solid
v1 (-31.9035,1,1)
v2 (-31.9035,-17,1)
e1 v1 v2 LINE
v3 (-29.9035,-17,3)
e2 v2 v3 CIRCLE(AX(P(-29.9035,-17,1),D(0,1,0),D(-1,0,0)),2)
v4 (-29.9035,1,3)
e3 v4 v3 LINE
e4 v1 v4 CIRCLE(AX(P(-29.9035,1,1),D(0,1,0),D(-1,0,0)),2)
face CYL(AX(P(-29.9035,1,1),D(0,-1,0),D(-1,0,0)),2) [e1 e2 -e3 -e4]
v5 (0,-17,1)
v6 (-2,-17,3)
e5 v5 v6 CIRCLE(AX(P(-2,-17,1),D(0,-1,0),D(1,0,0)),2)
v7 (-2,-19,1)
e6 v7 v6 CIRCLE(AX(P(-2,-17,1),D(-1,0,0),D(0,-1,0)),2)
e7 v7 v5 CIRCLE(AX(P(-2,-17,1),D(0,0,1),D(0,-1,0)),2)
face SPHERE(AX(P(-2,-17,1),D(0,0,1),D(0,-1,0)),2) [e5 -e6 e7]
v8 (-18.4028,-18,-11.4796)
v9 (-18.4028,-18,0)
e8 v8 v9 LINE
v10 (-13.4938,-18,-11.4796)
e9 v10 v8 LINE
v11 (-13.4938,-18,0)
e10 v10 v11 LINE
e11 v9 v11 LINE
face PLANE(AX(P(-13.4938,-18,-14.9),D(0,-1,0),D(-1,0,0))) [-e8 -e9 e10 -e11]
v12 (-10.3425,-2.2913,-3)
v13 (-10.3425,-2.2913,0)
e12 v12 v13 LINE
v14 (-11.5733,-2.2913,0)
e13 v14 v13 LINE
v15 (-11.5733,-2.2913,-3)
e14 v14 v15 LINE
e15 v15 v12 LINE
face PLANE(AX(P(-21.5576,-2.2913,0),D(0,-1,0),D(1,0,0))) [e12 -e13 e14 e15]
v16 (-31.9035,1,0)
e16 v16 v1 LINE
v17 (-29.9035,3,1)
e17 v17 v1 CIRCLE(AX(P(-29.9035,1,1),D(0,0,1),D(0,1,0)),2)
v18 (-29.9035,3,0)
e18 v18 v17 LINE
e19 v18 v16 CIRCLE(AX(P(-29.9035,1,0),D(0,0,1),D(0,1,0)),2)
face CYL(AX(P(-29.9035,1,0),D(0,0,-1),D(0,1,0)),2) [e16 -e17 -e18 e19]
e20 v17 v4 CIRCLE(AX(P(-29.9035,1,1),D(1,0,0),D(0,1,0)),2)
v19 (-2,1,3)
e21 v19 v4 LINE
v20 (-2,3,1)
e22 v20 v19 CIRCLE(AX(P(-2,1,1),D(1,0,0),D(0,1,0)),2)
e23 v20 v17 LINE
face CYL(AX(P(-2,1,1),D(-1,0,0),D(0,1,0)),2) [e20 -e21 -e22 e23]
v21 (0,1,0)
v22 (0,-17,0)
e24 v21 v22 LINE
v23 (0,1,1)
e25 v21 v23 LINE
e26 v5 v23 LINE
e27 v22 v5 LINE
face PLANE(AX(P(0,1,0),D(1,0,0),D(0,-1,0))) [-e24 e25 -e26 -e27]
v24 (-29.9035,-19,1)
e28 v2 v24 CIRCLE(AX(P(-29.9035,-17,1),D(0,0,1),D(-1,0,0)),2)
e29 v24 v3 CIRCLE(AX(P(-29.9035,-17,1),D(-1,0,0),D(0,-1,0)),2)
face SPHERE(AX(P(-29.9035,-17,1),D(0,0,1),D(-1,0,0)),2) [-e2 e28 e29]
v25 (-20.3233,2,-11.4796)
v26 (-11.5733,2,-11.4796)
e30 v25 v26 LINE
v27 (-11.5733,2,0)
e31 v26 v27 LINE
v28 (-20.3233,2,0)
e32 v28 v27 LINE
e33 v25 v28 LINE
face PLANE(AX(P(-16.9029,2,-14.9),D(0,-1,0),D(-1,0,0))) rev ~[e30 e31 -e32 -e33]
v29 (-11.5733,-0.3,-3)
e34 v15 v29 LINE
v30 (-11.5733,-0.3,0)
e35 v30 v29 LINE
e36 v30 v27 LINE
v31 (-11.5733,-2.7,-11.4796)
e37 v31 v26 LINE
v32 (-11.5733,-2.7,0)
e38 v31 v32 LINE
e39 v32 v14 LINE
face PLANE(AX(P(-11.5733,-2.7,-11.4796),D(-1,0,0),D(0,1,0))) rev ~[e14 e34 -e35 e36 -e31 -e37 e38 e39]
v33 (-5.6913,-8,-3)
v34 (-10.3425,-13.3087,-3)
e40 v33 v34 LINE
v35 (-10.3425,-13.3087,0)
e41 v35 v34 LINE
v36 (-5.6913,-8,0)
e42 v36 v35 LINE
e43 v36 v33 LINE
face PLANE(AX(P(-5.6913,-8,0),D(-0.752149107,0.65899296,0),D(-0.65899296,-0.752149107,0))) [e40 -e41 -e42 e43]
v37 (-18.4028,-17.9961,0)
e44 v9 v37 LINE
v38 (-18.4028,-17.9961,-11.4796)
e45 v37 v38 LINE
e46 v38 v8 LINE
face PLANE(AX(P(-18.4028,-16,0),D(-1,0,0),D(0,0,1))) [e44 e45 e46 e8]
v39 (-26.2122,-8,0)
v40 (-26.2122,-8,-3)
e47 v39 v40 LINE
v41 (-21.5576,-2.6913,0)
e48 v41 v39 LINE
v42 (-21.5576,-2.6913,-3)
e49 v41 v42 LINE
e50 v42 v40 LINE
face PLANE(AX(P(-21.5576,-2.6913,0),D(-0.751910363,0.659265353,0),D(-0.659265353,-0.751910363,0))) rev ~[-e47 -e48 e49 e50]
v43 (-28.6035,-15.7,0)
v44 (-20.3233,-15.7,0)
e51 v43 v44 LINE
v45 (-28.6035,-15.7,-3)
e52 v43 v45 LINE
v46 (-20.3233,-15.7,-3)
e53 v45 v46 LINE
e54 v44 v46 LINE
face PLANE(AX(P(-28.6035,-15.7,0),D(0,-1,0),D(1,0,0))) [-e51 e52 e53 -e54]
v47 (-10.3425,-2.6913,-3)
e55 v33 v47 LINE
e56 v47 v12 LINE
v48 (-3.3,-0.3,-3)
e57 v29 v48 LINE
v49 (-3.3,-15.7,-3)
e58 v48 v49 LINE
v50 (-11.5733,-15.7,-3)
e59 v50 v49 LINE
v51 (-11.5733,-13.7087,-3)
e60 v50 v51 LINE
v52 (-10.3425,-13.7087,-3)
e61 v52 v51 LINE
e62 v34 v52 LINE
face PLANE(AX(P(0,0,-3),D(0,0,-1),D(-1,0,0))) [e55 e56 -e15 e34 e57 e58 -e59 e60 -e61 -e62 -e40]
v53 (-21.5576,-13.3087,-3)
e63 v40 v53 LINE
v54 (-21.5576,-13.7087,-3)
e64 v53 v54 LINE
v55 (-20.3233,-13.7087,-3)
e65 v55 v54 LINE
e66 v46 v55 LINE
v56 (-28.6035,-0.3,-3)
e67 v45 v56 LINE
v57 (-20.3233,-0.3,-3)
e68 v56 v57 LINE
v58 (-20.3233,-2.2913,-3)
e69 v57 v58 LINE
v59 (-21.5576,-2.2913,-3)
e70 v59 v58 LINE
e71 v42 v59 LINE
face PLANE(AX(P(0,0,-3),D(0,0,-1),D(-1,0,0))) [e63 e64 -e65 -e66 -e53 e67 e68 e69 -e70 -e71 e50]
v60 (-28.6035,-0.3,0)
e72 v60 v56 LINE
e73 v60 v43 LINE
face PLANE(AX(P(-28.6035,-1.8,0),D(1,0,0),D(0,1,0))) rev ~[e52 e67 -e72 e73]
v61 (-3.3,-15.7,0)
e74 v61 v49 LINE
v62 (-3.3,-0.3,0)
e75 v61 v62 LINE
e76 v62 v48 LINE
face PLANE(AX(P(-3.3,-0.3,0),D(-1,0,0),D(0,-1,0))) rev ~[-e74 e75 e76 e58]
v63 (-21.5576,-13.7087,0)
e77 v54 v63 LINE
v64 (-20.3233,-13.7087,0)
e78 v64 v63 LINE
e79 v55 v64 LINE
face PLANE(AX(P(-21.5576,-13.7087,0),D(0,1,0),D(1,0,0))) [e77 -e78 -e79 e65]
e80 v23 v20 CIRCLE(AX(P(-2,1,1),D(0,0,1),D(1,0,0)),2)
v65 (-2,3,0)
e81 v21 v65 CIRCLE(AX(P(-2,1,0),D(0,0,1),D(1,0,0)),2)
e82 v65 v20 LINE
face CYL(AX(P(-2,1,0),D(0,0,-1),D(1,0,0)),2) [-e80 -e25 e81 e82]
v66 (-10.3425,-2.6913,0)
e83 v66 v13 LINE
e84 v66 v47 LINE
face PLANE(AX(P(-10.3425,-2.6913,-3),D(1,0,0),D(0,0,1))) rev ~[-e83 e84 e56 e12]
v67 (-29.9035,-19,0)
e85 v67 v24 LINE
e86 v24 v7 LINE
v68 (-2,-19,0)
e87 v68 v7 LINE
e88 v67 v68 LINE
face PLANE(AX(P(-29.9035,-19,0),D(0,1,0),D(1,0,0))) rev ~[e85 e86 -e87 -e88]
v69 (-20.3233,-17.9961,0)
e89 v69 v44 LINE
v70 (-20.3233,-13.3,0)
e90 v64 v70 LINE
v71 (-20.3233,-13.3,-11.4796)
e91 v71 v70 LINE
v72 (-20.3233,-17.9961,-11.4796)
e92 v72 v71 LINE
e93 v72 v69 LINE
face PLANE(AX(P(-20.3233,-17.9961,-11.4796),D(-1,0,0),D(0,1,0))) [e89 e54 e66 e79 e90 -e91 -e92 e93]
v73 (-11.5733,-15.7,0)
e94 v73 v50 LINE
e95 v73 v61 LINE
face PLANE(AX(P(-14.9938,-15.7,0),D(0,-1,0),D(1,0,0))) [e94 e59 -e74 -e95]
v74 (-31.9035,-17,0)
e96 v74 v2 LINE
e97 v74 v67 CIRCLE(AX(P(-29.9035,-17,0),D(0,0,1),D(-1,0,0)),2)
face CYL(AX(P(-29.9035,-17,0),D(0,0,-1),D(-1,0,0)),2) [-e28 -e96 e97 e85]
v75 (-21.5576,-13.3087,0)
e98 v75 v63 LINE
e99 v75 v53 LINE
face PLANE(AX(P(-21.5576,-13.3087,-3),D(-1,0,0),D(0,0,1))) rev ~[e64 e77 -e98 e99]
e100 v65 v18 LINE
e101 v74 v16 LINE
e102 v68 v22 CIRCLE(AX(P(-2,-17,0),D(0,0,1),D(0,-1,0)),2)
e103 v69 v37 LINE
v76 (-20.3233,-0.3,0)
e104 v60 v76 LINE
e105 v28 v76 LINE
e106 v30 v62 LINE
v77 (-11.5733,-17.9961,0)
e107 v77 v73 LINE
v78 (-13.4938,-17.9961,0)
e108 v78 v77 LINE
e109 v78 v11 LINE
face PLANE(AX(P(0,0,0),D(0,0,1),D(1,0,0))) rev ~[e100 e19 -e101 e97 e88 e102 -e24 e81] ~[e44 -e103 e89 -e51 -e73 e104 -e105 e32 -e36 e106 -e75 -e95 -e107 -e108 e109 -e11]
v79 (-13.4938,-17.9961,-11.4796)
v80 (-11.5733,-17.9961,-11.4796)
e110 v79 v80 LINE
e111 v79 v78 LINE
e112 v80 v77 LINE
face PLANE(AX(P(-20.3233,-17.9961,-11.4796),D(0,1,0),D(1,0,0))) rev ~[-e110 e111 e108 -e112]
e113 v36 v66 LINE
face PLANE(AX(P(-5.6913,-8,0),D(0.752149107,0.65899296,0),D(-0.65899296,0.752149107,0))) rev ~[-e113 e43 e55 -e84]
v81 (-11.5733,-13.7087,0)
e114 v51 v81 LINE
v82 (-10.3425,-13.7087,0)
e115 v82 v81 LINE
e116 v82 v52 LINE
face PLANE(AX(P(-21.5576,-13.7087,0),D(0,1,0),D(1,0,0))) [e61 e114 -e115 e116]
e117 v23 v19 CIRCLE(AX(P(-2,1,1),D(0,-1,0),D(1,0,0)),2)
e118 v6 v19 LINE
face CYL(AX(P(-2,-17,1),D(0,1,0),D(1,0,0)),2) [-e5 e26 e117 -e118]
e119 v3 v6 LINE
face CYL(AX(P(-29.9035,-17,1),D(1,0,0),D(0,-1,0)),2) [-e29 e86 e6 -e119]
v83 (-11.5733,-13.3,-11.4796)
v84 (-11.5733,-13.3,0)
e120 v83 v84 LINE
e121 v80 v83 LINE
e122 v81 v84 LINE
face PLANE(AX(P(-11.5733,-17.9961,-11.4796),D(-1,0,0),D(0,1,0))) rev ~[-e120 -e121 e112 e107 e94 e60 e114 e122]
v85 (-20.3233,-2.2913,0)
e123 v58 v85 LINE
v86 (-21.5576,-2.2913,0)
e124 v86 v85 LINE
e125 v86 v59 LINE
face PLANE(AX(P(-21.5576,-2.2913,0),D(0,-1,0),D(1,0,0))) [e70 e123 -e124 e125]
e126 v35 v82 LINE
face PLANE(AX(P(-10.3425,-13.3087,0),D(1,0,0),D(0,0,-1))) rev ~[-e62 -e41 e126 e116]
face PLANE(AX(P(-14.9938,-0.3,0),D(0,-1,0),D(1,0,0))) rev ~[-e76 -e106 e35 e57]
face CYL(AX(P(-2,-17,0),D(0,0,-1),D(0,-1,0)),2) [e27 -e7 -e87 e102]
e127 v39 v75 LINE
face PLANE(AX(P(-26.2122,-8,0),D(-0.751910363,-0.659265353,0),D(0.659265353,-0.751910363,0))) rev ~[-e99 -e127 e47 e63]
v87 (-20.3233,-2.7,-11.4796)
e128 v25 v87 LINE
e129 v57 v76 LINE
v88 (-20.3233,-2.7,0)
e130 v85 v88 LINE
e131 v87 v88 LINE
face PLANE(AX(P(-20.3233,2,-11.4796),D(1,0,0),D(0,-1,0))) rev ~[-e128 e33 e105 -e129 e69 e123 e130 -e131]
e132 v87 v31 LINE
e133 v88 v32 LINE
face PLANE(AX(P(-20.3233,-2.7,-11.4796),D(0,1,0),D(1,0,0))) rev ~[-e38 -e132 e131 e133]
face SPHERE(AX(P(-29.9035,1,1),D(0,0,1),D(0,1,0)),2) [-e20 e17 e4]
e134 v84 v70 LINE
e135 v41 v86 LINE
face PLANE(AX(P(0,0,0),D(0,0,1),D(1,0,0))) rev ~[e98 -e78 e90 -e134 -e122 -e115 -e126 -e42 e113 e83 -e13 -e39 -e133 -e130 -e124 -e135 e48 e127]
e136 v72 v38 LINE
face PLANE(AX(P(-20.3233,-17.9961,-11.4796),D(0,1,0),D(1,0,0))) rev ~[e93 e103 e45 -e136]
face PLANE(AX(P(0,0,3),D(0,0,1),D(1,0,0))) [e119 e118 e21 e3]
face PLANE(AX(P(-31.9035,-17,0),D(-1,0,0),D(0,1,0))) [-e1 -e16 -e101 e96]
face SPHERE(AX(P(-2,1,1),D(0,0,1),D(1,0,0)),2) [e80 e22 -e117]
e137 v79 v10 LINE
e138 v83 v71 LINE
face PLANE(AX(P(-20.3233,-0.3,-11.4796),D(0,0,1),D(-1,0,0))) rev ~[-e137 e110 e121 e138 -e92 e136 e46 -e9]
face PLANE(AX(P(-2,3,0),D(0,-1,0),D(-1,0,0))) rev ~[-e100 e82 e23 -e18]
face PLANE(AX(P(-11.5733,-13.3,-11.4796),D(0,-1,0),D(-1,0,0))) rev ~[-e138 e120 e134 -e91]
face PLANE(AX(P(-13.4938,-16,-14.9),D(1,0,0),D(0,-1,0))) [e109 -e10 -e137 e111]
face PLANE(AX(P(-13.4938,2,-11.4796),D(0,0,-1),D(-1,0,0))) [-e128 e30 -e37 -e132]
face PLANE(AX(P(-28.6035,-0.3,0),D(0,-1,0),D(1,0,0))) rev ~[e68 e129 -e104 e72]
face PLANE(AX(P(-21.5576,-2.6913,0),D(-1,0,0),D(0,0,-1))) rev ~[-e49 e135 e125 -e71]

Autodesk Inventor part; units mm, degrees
ref_plane "YZ Plane" through (0, 0, 0) normal (1, 0, 0) x (0, 1, 0)
ref_plane "XZ Plane" through (0, 0, 0) normal (0, 1, 0) x (-1, 0, 0)
sketch "Sketch1" plane through (0, 0, 0) normal (0, 0, 1) x (1, 0, 0)
  arc A0 (-31.9035, -17) -> (-29.9035, -19) centre (-29.9035, -17) ccw projected
  line L0 (-29.9035, -19) -> (-2, -19) projected
  arc A1 (-2, -19) -> (0, -17) centre (-2, -17) ccw projected
  line L1 (0, 1) -> (0, -17) projected
  arc A2 (0, 1) -> (-2, 3) centre (-2, 1) ccw projected
  line L2 (-2, 3) -> (-29.9035, 3) projected
  arc A3 (-29.9035, 3) -> (-31.9035, 1) centre (-29.9035, 1) ccw projected
  line L3 (-31.9035, -17) -> (-31.9035, 1) projected
  line L4 (-17.2029, -18.3) -> (-17.2029, -16) projected
  line L5 (-28.9035, -16) -> (-17.2029, -16) projected
  line L6 (-28.9035, 0) -> (-28.9035, -16) projected
  line L7 (-17.2029, 0) -> (-28.9035, 0) projected
  line L8 (-17.2029, 0) -> (-17.2029, 2.3) projected
  line L9 (-17.2029, 2.3) -> (-14.6938, 2.3) projected
  line L10 (-14.6938, 2.3) -> (-14.6938, 0) projected
  line L11 (-3, 0) -> (-14.6938, 0) projected
  line L12 (-3, 0) -> (-3, -16) projected
  line L13 (-14.6938, -16) -> (-3, -16) projected
  line L14 (-14.6938, -16) -> (-14.6938, -18.3) projected
  line L15 (-17.2029, -18.3) -> (-14.6938, -18.3) projected
  line L16 (-14.6938, -16) -> (-17.2029, -16)
  line L17 (-14.6938, 0) -> (-17.2029, 0)
  line L18 (-16.9029, -16) -> (-14.9938, -16)
  line L19 (-14.9938, -16) -> (-14.9938, -18)
  line L20 (-14.9938, -18) -> (-16.9029, -18)
  line L21 (-16.9029, -18) -> (-16.9029, -16)
  line L22 (-16.9029, 2) -> (-14.9938, 2)
  line L23 (-14.9938, 2) -> (-14.9938, 0)
  line L24 (-14.9938, 0) -> (-16.9029, 0)
  line L25 (-16.9029, 0) -> (-16.9029, 2)
  point P0 (0, 0)
  dimension "d5" = 0.3
  dimension "d6" = 0
  dimension "d7" = 0.3
  dimension "d8" = 0.3
  dimension "d9" = 0.3
  dimension "d10" = 0.3
  dimension "d11" = 0.3
  dimension "d12" = 0
extrude "Extrusion1" add sketch "Sketch1" against normal blind 14.9 contours L16 L19 L20 L21 | L25 L22 L23 L17
ref_plane "Work Plane1" through (0, 0, 0) normal (0, 0, 1) x (1, 0, 0)
sketch "Sketch2" plane through (0, 0, 0) normal (0, 0, 1) x (1, 0, 0)
  arc A0 (-31.9035, -17) -> (-29.9035, -19) centre (-29.9035, -17) ccw projected
  line L0 (-29.9035, -19) -> (-2, -19) projected
  arc A1 (-2, -19) -> (0, -17) centre (-2, -17) ccw projected
  line L1 (0, 1) -> (0, -17) projected
  arc A2 (0, 1) -> (-2, 3) centre (-2, 1) ccw projected
  line L2 (-2, 3) -> (-29.9035, 3) projected
  arc A3 (-29.9035, 3) -> (-31.9035, 1) centre (-29.9035, 1) ccw projected
  line L3 (-31.9035, -17) -> (-31.9035, 1) projected
  line L4 (-17.2029, -18.3) -> (-17.2029, -16) projected
  line L5 (-28.9035, -16) -> (-17.2029, -16) projected
  line L6 (-28.9035, 0) -> (-28.9035, -16) projected
  line L7 (-17.2029, 0) -> (-28.9035, 0) projected
  line L8 (-17.2029, 0) -> (-17.2029, 2.3) projected
  line L9 (-17.2029, 2.3) -> (-14.6938, 2.3) projected
  line L10 (-14.6938, 2.3) -> (-14.6938, 0) projected
  line L11 (-3, 0) -> (-14.6938, 0) projected
  line L12 (-3, 0) -> (-3, -16) projected
  line L13 (-14.6938, -16) -> (-3, -16) projected
  line L14 (-14.6938, -16) -> (-14.6938, -18.3) projected
  line L15 (-17.2029, -18.3) -> (-14.6938, -18.3) projected
  line L16 (-17.2029, 0) -> (-14.6938, 0) projected
  line L17 (-14.6938, 0) -> (-14.6938, 2.3) projected
  line L18 (-14.6938, 2.3) -> (-17.2029, 2.3) projected
  line L19 (-17.2029, 2.3) -> (-17.2029, 0) projected
  line L20 (-17.2029, -18.3) -> (-14.6938, -18.3) projected
  line L21 (-14.6938, -18.3) -> (-14.6938, -16) projected
  line L22 (-14.6938, -16) -> (-17.2029, -16) projected
  line L23 (-17.2029, -16) -> (-17.2029, -18.3) projected
  point P0 (0, 0)
extrude "Extrusion2" add sketch "Sketch2" along normal blind 3 contours L3 A3 L2 A2 L1 A1 L0 A0 | L4 L22 L14 L15 | L5 L6 L7 L16 L11 L12 L13 L22 | L8 L9 L10 L16
fillet "Fillet1" radius 2 8 edges at (-31.3177, -18.4142, 3) (-31.9035, -8, 3) (-31.3177, 2.4142, 3) (-15.9518, 3, 3) (-0.5858, 2.4142, 3) (0, -8, 3) (-0.5858, -18.4142, 3) (-15.9518, -19, 3)
sketch "Sketch3" plane through (0, 0, 0) normal (0, 0, -1) x (-1, 0, 0)
  arc A0 (29.9035, -19) -> (31.9035, -17) centre (29.9035, -17) ccw projected
  line L0 (29.9035, -19) -> (2, -19) projected
  arc A1 (0, -17) -> (2, -19) centre (2, -17) ccw projected
  line L1 (0, 1) -> (0, -17) projected
  arc A2 (2, 3) -> (0, 1) centre (2, 1) ccw projected
  line L2 (2, 3) -> (29.9035, 3) projected
  arc A3 (31.9035, 1) -> (29.9035, 3) centre (29.9035, 1) ccw projected
  line L3 (31.9035, -17) -> (31.9035, 1) projected
  line L4 (17.2029, -18.3) -> (17.2029, -16) projected
  line L5 (28.9035, -16) -> (17.2029, -16) projected
  line L6 (28.9035, 0) -> (28.9035, -16) projected
  line L7 (17.2029, 0) -> (28.9035, 0) projected
  line L8 (17.2029, 0) -> (17.2029, 2.3) projected
  line L9 (17.2029, 2.3) -> (14.6938, 2.3) projected
  line L10 (14.6938, 2.3) -> (14.6938, 0) projected
  line L11 (3, 0) -> (14.6938, 0) projected
  line L12 (3, 0) -> (3, -16) projected
  line L13 (14.6938, -16) -> (3, -16) projected
  line L14 (14.6938, -16) -> (14.6938, -18.3) projected
  line L15 (17.2029, -18.3) -> (14.6938, -18.3) projected
  line L16 (14.9938, 0) -> (16.9029, 0) projected
  line L17 (14.9938, 0) -> (14.9938, -0.3)
  line L18 (14.9938, -0.3) -> (3.3, -0.3)
  line L19 (3.3, -0.3) -> (3.3, -1.8)
  line L20 (3.3, -1.8) -> (28.6035, -1.8)
  line L21 (28.6035, -0.3) -> (16.9029, -0.3)
  line L22 (16.9029, 0) -> (16.9029, -0.3)
  line L23 (28.6035, -1.8) -> (28.6035, -0.3)
  line L24 (3, -8) -> (28.9035, -8) construction
  line L25 (14.9938, -16) -> (16.9029, -16)
  line L26 (14.9938, -16) -> (14.9938, -15.7)
  line L27 (14.9938, -15.7) -> (3.3, -15.7)
  line L28 (3.3, -15.7) -> (3.3, -14.2)
  line L29 (3.3, -14.2) -> (28.6035, -14.2)
  line L30 (28.6035, -15.7) -> (16.9029, -15.7)
  line L31 (16.9029, -16) -> (16.9029, -15.7)
  line L32 (28.6035, -14.2) -> (28.6035, -15.7)
  line L33 (3.3, -1.8) -> (3.3, -14.2)
  line L34 (4.8, -14.2) -> (4.8, -1.8)
  line L35 (28.6035, -1.8) -> (28.6035, -14.2)
  line L36 (27.1035, -14.2) -> (27.1035, -1.8)
  point P0 (0, 0)
  dimension "d13" = 0.3
  dimension "d14" = 0.3
  dimension "d15" = 1.5
  dimension "d16" = 0.3
  dimension "d17" = 0.3
  dimension "d20" = 1.5
  dimension "d21" = 1.5
extrude "Extrusion3" add sketch "Sketch3" along normal blind 3 contours L16 L22 L21 L23 L20 L19 L18 L17 | L20 L34 L29 L33 | L35 L29 L36 L20 | L29 L32 L30 L31 L25 L26 L27 L28
sketch "Sketch4" plane through (-14.9938, -18, -14.9) normal (1, 0, 0) x (0, 0, -1)
  line L0 (-14.9, -0.3) -> (2.2893, -0.3) projected
  line L1 (-14.9, 2) -> (-14.9, -0.3) projected
  line L2 (2.2893, 2) -> (-14.9, 2) projected
  line L3 (2.2893, 2) -> (2.2893, -0.3) projected
  line L4 (0, 2) -> (0, 0) projected
  line L5 (-14.9, 0) -> (0, 0) projected
  line L6 (-14.9, 2.3) -> (-14.9, 0) projected
  line L7 (-14.9, 2.3) -> (-11.9, 2.3) projected
  line L8 (-11.9, 2.3) -> (-11.9, 2) projected
  line L9 (-11.9, 2) -> (0, 2) projected
  line L10 (0, 18) -> (0, 20) projected
  line L11 (-14.9, 20) -> (0, 20) projected
  line L12 (-14.9, 20) -> (-14.9, 17.7) projected
  line L13 (-14.9, 17.7) -> (-11.9, 17.7) projected
  line L14 (-11.9, 17.7) -> (-11.9, 18) projected
  line L15 (-11.9, 18) -> (0, 18) projected
  line L16 (-7.45, 2) -> (-11.9, 4.6913)
  line L17 (-11.9, 4.6913) -> (-11.9, 2.3)
  line L18 (-11.9, 10) -> (3.9744, 10) construction
  line L19 (-7.45, 18) -> (-11.9, 15.3087)
  line L20 (-11.9, 15.3087) -> (-11.9, 17.7)
  point P0 (-14.9, 18)
extrude "Extrusion4" add sketch "Sketch4" against normal up to surface (1.9092 mm away) contours L8 L17 L16 L2 | L19 L20 L14 L15
sketch "Sketch6" plane through (0, 0, 0) normal (0, 0, -1) x (-1, 0, 0)
  line L0 (27.1035, -1.8) -> (4.8, -1.8) projected
  line L1 (4.8, -1.8) -> (4.8, -14.2) projected
  line L2 (4.8, -14.2) -> (27.1035, -14.2) projected
  line L3 (27.1035, -14.2) -> (27.1035, -1.8) projected
  line L4 (14.9938, -13.3087) -> (16.9029, -13.3087) projected
  line L5 (14.9938, -2.6913) -> (16.9029, -2.6913) projected
  line L6 (14.9938, -2.6913) -> (5.6913, -2.6913)
  line L7 (5.6913, -2.6913) -> (5.6913, -13.3087)
  line L8 (5.6913, -13.3087) -> (14.9938, -13.3087)
  line L9 (16.9029, -13.3087) -> (26.2122, -13.3087)
  line L10 (26.2122, -13.3087) -> (26.2122, -2.6913)
  line L11 (26.2122, -2.6913) -> (16.9029, -2.6913)
  point P0 (0, 0)
  dimension "d24" = 0.8913
  dimension "d25" = 0.8913
  dimension "d26" = 0.8913
extrude "Extrusion5" add sketch "Sketch6" along normal up to surface (3 mm away)
sketch "Sketch7" plane through (0, 0, 0) normal (0, 0, -1) x (-1, 0, 0)
  line L0 (14.9938, -2.6913) -> (14.9938, -0.3) projected
  line L1 (3.3, -0.3) -> (14.9938, -0.3) projected
  line L2 (3.3, -15.7) -> (3.3, -0.3) projected
  line L3 (14.9938, -15.7) -> (3.3, -15.7) projected
  line L4 (14.9938, -13.3087) -> (14.9938, -15.7) projected
  line L5 (5.6913, -13.3087) -> (14.9938, -13.3087) projected
  line L6 (5.6913, -2.6913) -> (5.6913, -13.3087) projected
  line L7 (14.9938, -2.6913) -> (5.6913, -2.6913) projected
  line L8 (16.9029, -0.3) -> (16.9029, -2.6913) projected
  line L9 (26.2122, -2.6913) -> (16.9029, -2.6913) projected
  line L10 (26.2122, -13.3087) -> (26.2122, -2.6913) projected
  line L11 (16.9029, -13.3087) -> (26.2122, -13.3087) projected
  line L12 (16.9029, -13.3087) -> (16.9029, -15.7) projected
  line L13 (28.6035, -15.7) -> (16.9029, -15.7) projected
  line L14 (28.6035, -0.3) -> (28.6035, -15.7) projected
  line L15 (16.9029, -0.3) -> (28.6035, -0.3) projected
  line L16 (5.6913, -8) -> (10.3425, -13.3087)
  line L17 (5.6913, -8) -> (10.3425, -2.6913)
  line L18 (21.5576, -2.6913) -> (26.2122, -8)
  line L19 (26.2122, -8) -> (21.5576, -13.3087)
  point P0 (0, 0)
extrude "Extrusion6" add sketch "Sketch7" along normal up to surface (3 mm away) contours L17 L6 L7 | L16 L5 L6 | L9 L10 L18 | L10 L11 L19
sketch "Sketch8" plane through (0, 0, -14.9) normal (0, 0, -1) x (-1, 0, 0)
  line L0 (16.9029, 2) -> (16.9029, 0) projected
  line L1 (14.9938, 0) -> (14.9938, 2) projected
  line L2 (16.9029, 0) -> (14.9938, 0) projected
  line L3 (13.4938, 2) -> (18.4028, 2)
  line L4 (18.4028, 2) -> (18.4028, 0)
  line L5 (18.4028, 0) -> (13.4938, 0)
  line L6 (13.4938, 0) -> (13.4938, 2)
  line L7 (3.3, -15.7) -> (3.3, -0.3) projected
  line L8 (28.6035, -0.3) -> (28.6035, -15.7) projected
  line L9 (3.3, -8) -> (28.6035, -8) construction
  line L10 (13.4938, -18) -> (18.4028, -18)
  line L11 (18.4028, -18) -> (18.4028, -16)
  line L12 (18.4028, -16) -> (13.4938, -16)
  line L13 (13.4938, -16) -> (13.4938, -18)
  point P0 (0, 0)
  dimension "d31" = 4.909
  dimension "d32" = 1.9092
  dimension "d33" = 1.4999
  dimension "d34" = 0
  dimension "d35" = 2
  dimension "d36" = 2
extrude "Extrusion7" add sketch "Sketch8" against normal up to surface (14.9 mm away)
sketch "Sketch9" plane through (-14.9938, -16, 0) normal (1, 0, 0) x (0, 0, -1)
  line L0 (0, 0) -> (7.45, 0) projected
  line L1 (7.45, 0) -> (3, 2.6913) projected
  line L2 (3, 2.6913) -> (3, 0.3) projected
  line L3 (0, 0.3) -> (3, 0.3) projected
  line L4 (0, 0) -> (0, 0.3) projected
  line L5 (7.45, 16) -> (0, 16) projected
  line L6 (0, 16) -> (0, 15.7) projected
  line L7 (0, 15.7) -> (3, 15.7) projected
  line L8 (3, 13.3087) -> (3, 15.7) projected
  line L9 (3, 13.3087) -> (7.45, 16) projected
  point P0 (0, 16)
extrude "Extrusion8" add sketch "Sketch9" along normal up to surface (1.4999 mm away)
sketch "Sketch10" plane through (-16.9029, -16, 0) normal (-1, 0, 0) x (0, 0, 1)
  line L0 (-7.45, 0) -> (0, 0) projected
  line L1 (0, 0.3) -> (0, 0) projected
  line L2 (0, 0.3) -> (-3, 0.3) projected
  line L3 (-3, 2.6913) -> (-3, 0.3) projected
  line L4 (-7.45, 0) -> (-3, 2.6913) projected
  line L5 (0, 16) -> (-7.45, 16) projected
  line L6 (-3, 13.3087) -> (-7.45, 16) projected
  line L7 (-3, 15.7) -> (-3, 13.3087) projected
  line L8 (0, 15.7) -> (-3, 15.7) projected
  line L9 (0, 16) -> (0, 15.7) projected
  point P0 (0, 16)
extrude "Extrusion9" add sketch "Sketch10" along normal up to surface (1.4999 mm away)
sketch "Sketch11" plane through (-21.5576, -2.6913, 0) normal (0, -1, 0) x (1, 0, 0)
  line L0 (11.2151, -3) -> (11.2151, 0) projected
  line L1 (0, 0) -> (11.2151, 0) projected
  line L2 (0, 0) -> (0, -3) projected
  line L3 (0, -3) -> (3.1547, -3) projected
  line L4 (3.1547, -3) -> (8.0637, -3) projected
  line L5 (8.0637, -3) -> (11.2151, -3) projected
  line L6 (8.0637, -7.45) -> (3.1547, -7.45) projected
  line L7 (3.1547, -3) -> (3.1547, -7.45) projected
  line L8 (8.0637, -7.45) -> (8.0637, -3) projected
  point P0 (21.5576, 0)
extrude "Extrusion10" cut sketch "Sketch11" against normal blind 0.4
sketch "Sketch12" plane through (-21.5576, -13.3087, 0) normal (0, 1, 0) x (1, 0, 0)
  line L0 (11.2151, 0) -> (11.2151, 3) projected
  line L1 (11.2151, 3) -> (8.0637, 3) projected
  line L2 (8.0637, 3) -> (3.1547, 3) projected
  line L3 (3.1547, 3) -> (0, 3) projected
  line L4 (0, 3) -> (0, 0) projected
  line L5 (11.2151, 0) -> (0, 0) projected
  line L6 (8.0637, 3.6614) -> (3.1547, 3.6614) projected
  line L7 (3.1547, 3.6614) -> (3.1547, 3) projected
  line L8 (8.0637, 3.6614) -> (8.0637, 3)
  point P0 (21.5576, 0)
extrude "Extrusion11" cut sketch "Sketch12" against normal blind 0.4
sketch "Sketch13" plane through (-18.4028, 0, -7.45) normal (0, -1, 0) x (1, 0, 0)
  line L0 (4.909, 0) -> (0, 0) projected
  line L1 (0, -7.45) -> (0, 0) projected
  line L2 (0, -7.45) -> (4.909, -7.45) projected
  line L3 (4.909, -7.45) -> (4.909, 0) projected
  point P0 (18.4028, 7.45)
ref_plane "Work Plane2" through (-20.3233, -0.3, -20.2296) normal (0, 1, 0) x (0, 0, 1)
extrude "Extrusion12" add sketch "Sketch13" along normal up to surface (0.3 mm away)
sketch "Sketch14" plane through (-18.4028, 2, -14.9) normal (0, 1, 0) x (1, 0, 0)
  line L0 (4.909, 0) -> (0, 0) projected
  line L1 (0, 0) -> (0, -14.9) projected
  line L2 (6.8295, -3.4204) -> (-1.9205, -3.4204)
  line L3 (0, -3.4204) -> (4.909, -3.4204)
  line L4 (4.909, -3.4204) -> (4.909, 0)
  line L5 (4.909, 0) -> (0, 0)
  line L6 (0, 0) -> (0, -3.4204)
  point P0 (18.4028, -14.9)
extrude "Extrusion13" cut sketch "Sketch14" against normal up to surface (20 mm away)
ref_plane "Work Plane3" through (-20.3233, -0.3, -11.4796) normal (0, 0, 1) x (-1, 0, 0)
sketch "Sketch15" plane through (-20.3233, -0.3, -11.4796) normal (0, 0, 1) x (-1, 0, 0)
  line L0 (-8.75, 17.6961) -> (-8.75, 13)
  line L1 (0, 17.6961) -> (-8.75, 17.6961)
  line L2 (-8.75, 13) -> (0, 13)
  line L3 (0, 17.6961) -> (0, 13)
  line L4 (-8.75, 2.4) -> (-8.75, -2.3)
  line L5 (0, 2.4) -> (-8.75, 2.4)
  line L6 (-8.75, -2.3) -> (0, -2.3)
  line L7 (0, -2.3) -> (0, 2.4)
  point P0 (-20.3233, -0.3)
extrude "Extrusion14" add sketch "Sketch15" along normal up to surface (11.4796 mm away)
equation "\"d7\" = d5"
equation "\"d8\" = d5"
equation "\"d9\" = d5"
equation "\"d10\" = d9"
equation "\"d11\" = d10"
equation "\"d20\" = d15"
equation "\"d21\" = d20"
equation "\"d25\" = d24"
equation "\"d26\" = d24"
equation "\"d33\" = -0.5 * d32 + 0.5 * d31"
equation "\"d35\" = d36"
properties part number "GearBoxTop"
